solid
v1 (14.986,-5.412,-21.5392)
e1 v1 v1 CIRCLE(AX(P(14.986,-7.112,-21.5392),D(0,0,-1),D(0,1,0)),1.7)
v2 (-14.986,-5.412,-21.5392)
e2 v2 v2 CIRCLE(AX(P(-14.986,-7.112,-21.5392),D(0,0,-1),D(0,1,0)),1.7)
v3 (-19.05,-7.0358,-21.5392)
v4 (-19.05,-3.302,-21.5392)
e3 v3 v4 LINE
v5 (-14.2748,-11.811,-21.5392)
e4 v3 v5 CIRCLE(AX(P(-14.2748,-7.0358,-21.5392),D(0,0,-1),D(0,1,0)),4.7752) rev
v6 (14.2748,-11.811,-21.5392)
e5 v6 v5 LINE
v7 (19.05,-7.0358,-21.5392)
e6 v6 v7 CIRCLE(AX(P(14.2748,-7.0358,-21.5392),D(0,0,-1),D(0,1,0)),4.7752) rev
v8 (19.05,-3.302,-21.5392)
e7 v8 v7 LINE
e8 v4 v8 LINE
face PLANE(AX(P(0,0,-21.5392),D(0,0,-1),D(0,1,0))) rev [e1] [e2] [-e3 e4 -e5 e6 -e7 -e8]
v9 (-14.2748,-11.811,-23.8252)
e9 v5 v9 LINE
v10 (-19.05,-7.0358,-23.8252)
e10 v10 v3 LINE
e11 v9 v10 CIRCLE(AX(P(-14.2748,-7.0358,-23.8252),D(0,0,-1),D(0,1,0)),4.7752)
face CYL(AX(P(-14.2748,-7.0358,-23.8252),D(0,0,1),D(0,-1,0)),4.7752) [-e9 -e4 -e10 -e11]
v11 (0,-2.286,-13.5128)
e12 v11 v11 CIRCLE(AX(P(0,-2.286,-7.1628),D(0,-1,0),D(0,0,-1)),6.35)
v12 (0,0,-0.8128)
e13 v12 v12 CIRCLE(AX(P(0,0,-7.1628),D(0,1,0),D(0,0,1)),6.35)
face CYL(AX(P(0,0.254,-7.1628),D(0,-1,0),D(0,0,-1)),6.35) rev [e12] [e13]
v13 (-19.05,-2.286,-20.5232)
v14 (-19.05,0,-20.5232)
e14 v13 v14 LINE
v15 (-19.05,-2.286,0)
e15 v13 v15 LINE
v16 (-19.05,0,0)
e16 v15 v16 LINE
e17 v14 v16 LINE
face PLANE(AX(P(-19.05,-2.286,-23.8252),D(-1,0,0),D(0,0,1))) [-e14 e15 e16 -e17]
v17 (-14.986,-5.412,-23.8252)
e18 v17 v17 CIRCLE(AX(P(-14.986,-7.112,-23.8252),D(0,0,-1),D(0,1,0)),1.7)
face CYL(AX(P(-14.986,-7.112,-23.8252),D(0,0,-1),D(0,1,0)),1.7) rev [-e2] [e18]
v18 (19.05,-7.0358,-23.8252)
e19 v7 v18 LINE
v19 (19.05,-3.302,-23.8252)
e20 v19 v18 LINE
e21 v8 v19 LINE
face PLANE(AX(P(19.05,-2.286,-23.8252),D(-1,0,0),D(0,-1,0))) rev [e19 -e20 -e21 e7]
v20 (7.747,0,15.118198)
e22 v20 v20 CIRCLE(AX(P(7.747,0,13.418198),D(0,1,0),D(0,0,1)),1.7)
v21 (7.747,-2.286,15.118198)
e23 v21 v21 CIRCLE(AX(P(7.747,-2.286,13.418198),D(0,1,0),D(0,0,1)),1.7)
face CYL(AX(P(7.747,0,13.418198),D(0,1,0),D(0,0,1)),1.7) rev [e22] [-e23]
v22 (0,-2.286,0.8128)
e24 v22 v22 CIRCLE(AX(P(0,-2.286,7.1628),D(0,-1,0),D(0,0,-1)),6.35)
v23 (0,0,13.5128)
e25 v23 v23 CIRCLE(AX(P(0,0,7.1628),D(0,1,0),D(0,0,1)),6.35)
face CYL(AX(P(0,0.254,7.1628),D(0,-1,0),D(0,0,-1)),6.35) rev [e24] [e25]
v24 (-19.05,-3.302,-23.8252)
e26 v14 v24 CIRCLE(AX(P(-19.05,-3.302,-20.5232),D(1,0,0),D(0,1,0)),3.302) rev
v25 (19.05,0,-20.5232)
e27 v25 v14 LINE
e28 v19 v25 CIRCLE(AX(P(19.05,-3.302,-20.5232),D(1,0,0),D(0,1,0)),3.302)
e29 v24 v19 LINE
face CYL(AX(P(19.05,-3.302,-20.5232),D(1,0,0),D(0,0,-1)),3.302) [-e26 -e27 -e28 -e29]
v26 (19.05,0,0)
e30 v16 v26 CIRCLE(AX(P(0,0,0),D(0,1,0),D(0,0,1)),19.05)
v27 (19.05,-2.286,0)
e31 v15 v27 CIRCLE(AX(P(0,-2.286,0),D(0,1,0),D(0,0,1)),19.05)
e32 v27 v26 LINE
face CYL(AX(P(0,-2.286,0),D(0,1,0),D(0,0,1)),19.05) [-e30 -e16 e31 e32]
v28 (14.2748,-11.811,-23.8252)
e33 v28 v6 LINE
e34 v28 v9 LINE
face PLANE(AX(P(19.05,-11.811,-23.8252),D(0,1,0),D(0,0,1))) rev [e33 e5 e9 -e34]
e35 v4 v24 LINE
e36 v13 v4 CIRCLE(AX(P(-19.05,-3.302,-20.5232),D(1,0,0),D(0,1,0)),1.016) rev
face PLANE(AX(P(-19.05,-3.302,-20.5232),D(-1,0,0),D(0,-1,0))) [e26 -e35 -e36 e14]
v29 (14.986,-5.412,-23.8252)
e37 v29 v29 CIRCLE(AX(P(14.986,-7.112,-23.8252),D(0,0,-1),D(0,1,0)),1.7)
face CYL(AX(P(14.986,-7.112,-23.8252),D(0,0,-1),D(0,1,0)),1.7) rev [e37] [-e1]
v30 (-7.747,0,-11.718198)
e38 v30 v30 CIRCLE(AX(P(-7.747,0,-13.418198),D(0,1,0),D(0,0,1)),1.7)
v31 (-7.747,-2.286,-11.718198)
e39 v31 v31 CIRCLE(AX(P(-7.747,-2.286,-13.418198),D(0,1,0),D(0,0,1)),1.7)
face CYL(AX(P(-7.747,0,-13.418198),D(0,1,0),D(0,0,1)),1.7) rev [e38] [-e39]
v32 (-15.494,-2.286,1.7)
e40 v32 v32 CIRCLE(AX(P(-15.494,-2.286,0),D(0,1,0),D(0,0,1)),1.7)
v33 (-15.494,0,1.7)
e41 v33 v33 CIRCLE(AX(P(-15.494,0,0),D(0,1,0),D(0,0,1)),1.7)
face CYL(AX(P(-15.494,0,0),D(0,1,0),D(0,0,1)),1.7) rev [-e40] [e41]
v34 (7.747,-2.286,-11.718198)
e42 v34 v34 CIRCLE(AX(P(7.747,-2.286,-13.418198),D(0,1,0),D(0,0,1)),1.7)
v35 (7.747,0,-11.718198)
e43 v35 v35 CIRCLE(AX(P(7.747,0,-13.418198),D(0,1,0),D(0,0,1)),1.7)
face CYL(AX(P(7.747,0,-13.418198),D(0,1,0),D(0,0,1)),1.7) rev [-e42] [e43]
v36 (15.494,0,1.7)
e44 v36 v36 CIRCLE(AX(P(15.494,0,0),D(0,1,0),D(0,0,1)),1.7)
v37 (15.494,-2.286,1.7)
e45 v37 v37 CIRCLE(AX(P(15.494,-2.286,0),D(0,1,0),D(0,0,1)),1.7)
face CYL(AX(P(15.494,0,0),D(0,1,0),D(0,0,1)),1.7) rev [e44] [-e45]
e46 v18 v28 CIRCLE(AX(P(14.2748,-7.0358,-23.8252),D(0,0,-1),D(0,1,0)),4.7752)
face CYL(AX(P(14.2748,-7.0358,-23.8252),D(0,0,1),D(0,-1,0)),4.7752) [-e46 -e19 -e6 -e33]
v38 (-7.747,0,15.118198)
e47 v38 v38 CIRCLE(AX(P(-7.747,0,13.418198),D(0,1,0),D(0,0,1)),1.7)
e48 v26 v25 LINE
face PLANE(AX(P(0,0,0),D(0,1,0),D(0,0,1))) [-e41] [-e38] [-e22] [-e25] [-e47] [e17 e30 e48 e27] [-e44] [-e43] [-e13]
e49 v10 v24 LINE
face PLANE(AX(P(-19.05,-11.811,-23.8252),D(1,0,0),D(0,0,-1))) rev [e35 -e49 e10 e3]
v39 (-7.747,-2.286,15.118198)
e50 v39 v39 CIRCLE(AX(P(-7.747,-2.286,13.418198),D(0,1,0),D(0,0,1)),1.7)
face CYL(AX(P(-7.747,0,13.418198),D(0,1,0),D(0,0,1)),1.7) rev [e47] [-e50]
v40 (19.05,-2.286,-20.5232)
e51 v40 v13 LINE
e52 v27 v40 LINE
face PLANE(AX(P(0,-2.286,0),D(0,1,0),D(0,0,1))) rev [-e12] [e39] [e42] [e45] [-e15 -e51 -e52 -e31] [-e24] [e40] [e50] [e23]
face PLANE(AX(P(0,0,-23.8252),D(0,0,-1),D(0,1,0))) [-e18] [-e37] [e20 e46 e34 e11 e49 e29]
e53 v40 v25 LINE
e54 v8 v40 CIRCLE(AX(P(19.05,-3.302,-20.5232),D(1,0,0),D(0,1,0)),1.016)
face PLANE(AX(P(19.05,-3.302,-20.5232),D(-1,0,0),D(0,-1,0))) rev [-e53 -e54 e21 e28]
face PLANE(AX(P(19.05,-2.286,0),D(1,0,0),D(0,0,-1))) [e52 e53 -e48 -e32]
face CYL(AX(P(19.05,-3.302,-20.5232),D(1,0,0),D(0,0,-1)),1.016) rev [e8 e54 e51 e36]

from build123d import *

# Parameters (mm, degrees)
BASE_FLANGIA_DEPTH            = 2.286
BORDO_FLANGIA_STRIP_W         = 11.176
BORDO_FLANGIA_STRIP_H         = 2.286
BORDO_FLANGIA_STRIP_CUT_DEPTH = 38.1
BORDO_FLANGIA_DEPTH           = 38.1
FORO_PER_VITE_M3_1_D          = 3.4
RIPETIZIONECIRCOLARE1_COUNT   = 6
SCHIZZO7_R                    = 6.35
TAGLIO_ESTRUSIONE1_DEPTH      = 2.54
FORO_PER_VITE_M3_2_D          = 3.4
RACCORDO_R                    = 4.7752


# Sheet-metal steps are written as plain solids
with BuildPart() as part:
    # Schizzo1 → Base-Flangia (new body)
    with BuildSketch(Plane(origin=(0, 0, 0), x_dir=(1, 0, 0), z_dir=(0, 1, 0))):
        with BuildLine():
            Line((19.05, 0), (19.05, 23.8252))
            Line((19.05, 23.8252), (-19.05, 23.8252))
            Line((-19.05, 23.8252), (-19.05, 0))
            ThreePointArc((-19.05, 0), (0, -19.05), (19.05, 0))
        make_face()
    extrude(amount=-BASE_FLANGIA_DEPTH)

    # Bordo-Flangia strip (across the edge) → Bordo-Flangia strip cut (cut)
    with BuildSketch(Plane(origin=(-19.05, -2.286, -23.8252), x_dir=(0, 0, 1), z_dir=(1, 0, 0))):
        with Locations((-2.286, -1.143)):
            Rectangle(BORDO_FLANGIA_STRIP_W, BORDO_FLANGIA_STRIP_H)
    extrude(amount=BORDO_FLANGIA_STRIP_CUT_DEPTH, mode=Mode.SUBTRACT)

    # Bordo-Flangia section (across the edge) → Bordo-Flangia (add)
    with BuildSketch(Plane(origin=(-19.05, -2.286, -23.8252), x_dir=(0, 0, 1), z_dir=(1, 0, 0))):
        with BuildLine():
            Line((0, 1.016), (0, 9.525))
            Line((0, 9.525), (2.286, 9.525))
            Line((2.286, 9.525), (2.286, 1.016))
            ThreePointArc((2.286, 1.016), (2.58357951, 0.29757951), (3.302, 0))
            Line((3.302, 0), (3.302, -2.286))
            ThreePointArc((3.302, -2.286), (0.967133409, -1.318866591), (0, 1.016))
        make_face()
    extrude(amount=BORDO_FLANGIA_DEPTH)

    # Foro per Vite M3-1 (through all)
    with Locations(Plane(origin=(0, 0, 0), x_dir=(1, 0, 0), z_dir=(0, 1, 0))):
        with Locations((15.494, 0)):
            foro_per_vite_m3_1 = Hole(FORO_PER_VITE_M3_1_D / 2)

    # RipetizioneCircolare1: Foro per Vite M3-1 ×6 about axis
    ripetizionecircolare1_axis = Axis((0, 0, 0), (0, 1, 0))
    for i in range(1, RIPETIZIONECIRCOLARE1_COUNT):
        add(foro_per_vite_m3_1.rotate(ripetizionecircolare1_axis, i * 360 / RIPETIZIONECIRCOLARE1_COUNT), mode=Mode.SUBTRACT)

    # Schizzo7 → Taglio-Estrusione1 (cut)
    with BuildSketch(Plane.XZ.offset(2.286)):
        with Locations(Location((0, -7.1628, 0), (0, 0, 270))):
            Circle(SCHIZZO7_R)
        with Locations(Location((0, 7.1628, 0), (0, 0, 270))):
            Circle(SCHIZZO7_R)
    extrude(amount=-TAGLIO_ESTRUSIONE1_DEPTH, mode=Mode.SUBTRACT)

    # Foro per Vite M3-2 (through all)
    with Locations(Plane(origin=(0, 0, -23.8252), x_dir=(1, 0, 0), z_dir=(0, 0, -1))):
        with Locations((14.986, 7.112), (-14.986, 7.112)):
            Hole(FORO_PER_VITE_M3_2_D / 2)

    # Raccordo
    raccordo_edges = [part.edges().sort_by_distance(p)[0] for p in [
        (-19.05, -11.811, -22.6822),
        (19.05, -11.811, -22.6822),
    ]]
    fillet(raccordo_edges, radius=RACCORDO_R)


solid = part.part
